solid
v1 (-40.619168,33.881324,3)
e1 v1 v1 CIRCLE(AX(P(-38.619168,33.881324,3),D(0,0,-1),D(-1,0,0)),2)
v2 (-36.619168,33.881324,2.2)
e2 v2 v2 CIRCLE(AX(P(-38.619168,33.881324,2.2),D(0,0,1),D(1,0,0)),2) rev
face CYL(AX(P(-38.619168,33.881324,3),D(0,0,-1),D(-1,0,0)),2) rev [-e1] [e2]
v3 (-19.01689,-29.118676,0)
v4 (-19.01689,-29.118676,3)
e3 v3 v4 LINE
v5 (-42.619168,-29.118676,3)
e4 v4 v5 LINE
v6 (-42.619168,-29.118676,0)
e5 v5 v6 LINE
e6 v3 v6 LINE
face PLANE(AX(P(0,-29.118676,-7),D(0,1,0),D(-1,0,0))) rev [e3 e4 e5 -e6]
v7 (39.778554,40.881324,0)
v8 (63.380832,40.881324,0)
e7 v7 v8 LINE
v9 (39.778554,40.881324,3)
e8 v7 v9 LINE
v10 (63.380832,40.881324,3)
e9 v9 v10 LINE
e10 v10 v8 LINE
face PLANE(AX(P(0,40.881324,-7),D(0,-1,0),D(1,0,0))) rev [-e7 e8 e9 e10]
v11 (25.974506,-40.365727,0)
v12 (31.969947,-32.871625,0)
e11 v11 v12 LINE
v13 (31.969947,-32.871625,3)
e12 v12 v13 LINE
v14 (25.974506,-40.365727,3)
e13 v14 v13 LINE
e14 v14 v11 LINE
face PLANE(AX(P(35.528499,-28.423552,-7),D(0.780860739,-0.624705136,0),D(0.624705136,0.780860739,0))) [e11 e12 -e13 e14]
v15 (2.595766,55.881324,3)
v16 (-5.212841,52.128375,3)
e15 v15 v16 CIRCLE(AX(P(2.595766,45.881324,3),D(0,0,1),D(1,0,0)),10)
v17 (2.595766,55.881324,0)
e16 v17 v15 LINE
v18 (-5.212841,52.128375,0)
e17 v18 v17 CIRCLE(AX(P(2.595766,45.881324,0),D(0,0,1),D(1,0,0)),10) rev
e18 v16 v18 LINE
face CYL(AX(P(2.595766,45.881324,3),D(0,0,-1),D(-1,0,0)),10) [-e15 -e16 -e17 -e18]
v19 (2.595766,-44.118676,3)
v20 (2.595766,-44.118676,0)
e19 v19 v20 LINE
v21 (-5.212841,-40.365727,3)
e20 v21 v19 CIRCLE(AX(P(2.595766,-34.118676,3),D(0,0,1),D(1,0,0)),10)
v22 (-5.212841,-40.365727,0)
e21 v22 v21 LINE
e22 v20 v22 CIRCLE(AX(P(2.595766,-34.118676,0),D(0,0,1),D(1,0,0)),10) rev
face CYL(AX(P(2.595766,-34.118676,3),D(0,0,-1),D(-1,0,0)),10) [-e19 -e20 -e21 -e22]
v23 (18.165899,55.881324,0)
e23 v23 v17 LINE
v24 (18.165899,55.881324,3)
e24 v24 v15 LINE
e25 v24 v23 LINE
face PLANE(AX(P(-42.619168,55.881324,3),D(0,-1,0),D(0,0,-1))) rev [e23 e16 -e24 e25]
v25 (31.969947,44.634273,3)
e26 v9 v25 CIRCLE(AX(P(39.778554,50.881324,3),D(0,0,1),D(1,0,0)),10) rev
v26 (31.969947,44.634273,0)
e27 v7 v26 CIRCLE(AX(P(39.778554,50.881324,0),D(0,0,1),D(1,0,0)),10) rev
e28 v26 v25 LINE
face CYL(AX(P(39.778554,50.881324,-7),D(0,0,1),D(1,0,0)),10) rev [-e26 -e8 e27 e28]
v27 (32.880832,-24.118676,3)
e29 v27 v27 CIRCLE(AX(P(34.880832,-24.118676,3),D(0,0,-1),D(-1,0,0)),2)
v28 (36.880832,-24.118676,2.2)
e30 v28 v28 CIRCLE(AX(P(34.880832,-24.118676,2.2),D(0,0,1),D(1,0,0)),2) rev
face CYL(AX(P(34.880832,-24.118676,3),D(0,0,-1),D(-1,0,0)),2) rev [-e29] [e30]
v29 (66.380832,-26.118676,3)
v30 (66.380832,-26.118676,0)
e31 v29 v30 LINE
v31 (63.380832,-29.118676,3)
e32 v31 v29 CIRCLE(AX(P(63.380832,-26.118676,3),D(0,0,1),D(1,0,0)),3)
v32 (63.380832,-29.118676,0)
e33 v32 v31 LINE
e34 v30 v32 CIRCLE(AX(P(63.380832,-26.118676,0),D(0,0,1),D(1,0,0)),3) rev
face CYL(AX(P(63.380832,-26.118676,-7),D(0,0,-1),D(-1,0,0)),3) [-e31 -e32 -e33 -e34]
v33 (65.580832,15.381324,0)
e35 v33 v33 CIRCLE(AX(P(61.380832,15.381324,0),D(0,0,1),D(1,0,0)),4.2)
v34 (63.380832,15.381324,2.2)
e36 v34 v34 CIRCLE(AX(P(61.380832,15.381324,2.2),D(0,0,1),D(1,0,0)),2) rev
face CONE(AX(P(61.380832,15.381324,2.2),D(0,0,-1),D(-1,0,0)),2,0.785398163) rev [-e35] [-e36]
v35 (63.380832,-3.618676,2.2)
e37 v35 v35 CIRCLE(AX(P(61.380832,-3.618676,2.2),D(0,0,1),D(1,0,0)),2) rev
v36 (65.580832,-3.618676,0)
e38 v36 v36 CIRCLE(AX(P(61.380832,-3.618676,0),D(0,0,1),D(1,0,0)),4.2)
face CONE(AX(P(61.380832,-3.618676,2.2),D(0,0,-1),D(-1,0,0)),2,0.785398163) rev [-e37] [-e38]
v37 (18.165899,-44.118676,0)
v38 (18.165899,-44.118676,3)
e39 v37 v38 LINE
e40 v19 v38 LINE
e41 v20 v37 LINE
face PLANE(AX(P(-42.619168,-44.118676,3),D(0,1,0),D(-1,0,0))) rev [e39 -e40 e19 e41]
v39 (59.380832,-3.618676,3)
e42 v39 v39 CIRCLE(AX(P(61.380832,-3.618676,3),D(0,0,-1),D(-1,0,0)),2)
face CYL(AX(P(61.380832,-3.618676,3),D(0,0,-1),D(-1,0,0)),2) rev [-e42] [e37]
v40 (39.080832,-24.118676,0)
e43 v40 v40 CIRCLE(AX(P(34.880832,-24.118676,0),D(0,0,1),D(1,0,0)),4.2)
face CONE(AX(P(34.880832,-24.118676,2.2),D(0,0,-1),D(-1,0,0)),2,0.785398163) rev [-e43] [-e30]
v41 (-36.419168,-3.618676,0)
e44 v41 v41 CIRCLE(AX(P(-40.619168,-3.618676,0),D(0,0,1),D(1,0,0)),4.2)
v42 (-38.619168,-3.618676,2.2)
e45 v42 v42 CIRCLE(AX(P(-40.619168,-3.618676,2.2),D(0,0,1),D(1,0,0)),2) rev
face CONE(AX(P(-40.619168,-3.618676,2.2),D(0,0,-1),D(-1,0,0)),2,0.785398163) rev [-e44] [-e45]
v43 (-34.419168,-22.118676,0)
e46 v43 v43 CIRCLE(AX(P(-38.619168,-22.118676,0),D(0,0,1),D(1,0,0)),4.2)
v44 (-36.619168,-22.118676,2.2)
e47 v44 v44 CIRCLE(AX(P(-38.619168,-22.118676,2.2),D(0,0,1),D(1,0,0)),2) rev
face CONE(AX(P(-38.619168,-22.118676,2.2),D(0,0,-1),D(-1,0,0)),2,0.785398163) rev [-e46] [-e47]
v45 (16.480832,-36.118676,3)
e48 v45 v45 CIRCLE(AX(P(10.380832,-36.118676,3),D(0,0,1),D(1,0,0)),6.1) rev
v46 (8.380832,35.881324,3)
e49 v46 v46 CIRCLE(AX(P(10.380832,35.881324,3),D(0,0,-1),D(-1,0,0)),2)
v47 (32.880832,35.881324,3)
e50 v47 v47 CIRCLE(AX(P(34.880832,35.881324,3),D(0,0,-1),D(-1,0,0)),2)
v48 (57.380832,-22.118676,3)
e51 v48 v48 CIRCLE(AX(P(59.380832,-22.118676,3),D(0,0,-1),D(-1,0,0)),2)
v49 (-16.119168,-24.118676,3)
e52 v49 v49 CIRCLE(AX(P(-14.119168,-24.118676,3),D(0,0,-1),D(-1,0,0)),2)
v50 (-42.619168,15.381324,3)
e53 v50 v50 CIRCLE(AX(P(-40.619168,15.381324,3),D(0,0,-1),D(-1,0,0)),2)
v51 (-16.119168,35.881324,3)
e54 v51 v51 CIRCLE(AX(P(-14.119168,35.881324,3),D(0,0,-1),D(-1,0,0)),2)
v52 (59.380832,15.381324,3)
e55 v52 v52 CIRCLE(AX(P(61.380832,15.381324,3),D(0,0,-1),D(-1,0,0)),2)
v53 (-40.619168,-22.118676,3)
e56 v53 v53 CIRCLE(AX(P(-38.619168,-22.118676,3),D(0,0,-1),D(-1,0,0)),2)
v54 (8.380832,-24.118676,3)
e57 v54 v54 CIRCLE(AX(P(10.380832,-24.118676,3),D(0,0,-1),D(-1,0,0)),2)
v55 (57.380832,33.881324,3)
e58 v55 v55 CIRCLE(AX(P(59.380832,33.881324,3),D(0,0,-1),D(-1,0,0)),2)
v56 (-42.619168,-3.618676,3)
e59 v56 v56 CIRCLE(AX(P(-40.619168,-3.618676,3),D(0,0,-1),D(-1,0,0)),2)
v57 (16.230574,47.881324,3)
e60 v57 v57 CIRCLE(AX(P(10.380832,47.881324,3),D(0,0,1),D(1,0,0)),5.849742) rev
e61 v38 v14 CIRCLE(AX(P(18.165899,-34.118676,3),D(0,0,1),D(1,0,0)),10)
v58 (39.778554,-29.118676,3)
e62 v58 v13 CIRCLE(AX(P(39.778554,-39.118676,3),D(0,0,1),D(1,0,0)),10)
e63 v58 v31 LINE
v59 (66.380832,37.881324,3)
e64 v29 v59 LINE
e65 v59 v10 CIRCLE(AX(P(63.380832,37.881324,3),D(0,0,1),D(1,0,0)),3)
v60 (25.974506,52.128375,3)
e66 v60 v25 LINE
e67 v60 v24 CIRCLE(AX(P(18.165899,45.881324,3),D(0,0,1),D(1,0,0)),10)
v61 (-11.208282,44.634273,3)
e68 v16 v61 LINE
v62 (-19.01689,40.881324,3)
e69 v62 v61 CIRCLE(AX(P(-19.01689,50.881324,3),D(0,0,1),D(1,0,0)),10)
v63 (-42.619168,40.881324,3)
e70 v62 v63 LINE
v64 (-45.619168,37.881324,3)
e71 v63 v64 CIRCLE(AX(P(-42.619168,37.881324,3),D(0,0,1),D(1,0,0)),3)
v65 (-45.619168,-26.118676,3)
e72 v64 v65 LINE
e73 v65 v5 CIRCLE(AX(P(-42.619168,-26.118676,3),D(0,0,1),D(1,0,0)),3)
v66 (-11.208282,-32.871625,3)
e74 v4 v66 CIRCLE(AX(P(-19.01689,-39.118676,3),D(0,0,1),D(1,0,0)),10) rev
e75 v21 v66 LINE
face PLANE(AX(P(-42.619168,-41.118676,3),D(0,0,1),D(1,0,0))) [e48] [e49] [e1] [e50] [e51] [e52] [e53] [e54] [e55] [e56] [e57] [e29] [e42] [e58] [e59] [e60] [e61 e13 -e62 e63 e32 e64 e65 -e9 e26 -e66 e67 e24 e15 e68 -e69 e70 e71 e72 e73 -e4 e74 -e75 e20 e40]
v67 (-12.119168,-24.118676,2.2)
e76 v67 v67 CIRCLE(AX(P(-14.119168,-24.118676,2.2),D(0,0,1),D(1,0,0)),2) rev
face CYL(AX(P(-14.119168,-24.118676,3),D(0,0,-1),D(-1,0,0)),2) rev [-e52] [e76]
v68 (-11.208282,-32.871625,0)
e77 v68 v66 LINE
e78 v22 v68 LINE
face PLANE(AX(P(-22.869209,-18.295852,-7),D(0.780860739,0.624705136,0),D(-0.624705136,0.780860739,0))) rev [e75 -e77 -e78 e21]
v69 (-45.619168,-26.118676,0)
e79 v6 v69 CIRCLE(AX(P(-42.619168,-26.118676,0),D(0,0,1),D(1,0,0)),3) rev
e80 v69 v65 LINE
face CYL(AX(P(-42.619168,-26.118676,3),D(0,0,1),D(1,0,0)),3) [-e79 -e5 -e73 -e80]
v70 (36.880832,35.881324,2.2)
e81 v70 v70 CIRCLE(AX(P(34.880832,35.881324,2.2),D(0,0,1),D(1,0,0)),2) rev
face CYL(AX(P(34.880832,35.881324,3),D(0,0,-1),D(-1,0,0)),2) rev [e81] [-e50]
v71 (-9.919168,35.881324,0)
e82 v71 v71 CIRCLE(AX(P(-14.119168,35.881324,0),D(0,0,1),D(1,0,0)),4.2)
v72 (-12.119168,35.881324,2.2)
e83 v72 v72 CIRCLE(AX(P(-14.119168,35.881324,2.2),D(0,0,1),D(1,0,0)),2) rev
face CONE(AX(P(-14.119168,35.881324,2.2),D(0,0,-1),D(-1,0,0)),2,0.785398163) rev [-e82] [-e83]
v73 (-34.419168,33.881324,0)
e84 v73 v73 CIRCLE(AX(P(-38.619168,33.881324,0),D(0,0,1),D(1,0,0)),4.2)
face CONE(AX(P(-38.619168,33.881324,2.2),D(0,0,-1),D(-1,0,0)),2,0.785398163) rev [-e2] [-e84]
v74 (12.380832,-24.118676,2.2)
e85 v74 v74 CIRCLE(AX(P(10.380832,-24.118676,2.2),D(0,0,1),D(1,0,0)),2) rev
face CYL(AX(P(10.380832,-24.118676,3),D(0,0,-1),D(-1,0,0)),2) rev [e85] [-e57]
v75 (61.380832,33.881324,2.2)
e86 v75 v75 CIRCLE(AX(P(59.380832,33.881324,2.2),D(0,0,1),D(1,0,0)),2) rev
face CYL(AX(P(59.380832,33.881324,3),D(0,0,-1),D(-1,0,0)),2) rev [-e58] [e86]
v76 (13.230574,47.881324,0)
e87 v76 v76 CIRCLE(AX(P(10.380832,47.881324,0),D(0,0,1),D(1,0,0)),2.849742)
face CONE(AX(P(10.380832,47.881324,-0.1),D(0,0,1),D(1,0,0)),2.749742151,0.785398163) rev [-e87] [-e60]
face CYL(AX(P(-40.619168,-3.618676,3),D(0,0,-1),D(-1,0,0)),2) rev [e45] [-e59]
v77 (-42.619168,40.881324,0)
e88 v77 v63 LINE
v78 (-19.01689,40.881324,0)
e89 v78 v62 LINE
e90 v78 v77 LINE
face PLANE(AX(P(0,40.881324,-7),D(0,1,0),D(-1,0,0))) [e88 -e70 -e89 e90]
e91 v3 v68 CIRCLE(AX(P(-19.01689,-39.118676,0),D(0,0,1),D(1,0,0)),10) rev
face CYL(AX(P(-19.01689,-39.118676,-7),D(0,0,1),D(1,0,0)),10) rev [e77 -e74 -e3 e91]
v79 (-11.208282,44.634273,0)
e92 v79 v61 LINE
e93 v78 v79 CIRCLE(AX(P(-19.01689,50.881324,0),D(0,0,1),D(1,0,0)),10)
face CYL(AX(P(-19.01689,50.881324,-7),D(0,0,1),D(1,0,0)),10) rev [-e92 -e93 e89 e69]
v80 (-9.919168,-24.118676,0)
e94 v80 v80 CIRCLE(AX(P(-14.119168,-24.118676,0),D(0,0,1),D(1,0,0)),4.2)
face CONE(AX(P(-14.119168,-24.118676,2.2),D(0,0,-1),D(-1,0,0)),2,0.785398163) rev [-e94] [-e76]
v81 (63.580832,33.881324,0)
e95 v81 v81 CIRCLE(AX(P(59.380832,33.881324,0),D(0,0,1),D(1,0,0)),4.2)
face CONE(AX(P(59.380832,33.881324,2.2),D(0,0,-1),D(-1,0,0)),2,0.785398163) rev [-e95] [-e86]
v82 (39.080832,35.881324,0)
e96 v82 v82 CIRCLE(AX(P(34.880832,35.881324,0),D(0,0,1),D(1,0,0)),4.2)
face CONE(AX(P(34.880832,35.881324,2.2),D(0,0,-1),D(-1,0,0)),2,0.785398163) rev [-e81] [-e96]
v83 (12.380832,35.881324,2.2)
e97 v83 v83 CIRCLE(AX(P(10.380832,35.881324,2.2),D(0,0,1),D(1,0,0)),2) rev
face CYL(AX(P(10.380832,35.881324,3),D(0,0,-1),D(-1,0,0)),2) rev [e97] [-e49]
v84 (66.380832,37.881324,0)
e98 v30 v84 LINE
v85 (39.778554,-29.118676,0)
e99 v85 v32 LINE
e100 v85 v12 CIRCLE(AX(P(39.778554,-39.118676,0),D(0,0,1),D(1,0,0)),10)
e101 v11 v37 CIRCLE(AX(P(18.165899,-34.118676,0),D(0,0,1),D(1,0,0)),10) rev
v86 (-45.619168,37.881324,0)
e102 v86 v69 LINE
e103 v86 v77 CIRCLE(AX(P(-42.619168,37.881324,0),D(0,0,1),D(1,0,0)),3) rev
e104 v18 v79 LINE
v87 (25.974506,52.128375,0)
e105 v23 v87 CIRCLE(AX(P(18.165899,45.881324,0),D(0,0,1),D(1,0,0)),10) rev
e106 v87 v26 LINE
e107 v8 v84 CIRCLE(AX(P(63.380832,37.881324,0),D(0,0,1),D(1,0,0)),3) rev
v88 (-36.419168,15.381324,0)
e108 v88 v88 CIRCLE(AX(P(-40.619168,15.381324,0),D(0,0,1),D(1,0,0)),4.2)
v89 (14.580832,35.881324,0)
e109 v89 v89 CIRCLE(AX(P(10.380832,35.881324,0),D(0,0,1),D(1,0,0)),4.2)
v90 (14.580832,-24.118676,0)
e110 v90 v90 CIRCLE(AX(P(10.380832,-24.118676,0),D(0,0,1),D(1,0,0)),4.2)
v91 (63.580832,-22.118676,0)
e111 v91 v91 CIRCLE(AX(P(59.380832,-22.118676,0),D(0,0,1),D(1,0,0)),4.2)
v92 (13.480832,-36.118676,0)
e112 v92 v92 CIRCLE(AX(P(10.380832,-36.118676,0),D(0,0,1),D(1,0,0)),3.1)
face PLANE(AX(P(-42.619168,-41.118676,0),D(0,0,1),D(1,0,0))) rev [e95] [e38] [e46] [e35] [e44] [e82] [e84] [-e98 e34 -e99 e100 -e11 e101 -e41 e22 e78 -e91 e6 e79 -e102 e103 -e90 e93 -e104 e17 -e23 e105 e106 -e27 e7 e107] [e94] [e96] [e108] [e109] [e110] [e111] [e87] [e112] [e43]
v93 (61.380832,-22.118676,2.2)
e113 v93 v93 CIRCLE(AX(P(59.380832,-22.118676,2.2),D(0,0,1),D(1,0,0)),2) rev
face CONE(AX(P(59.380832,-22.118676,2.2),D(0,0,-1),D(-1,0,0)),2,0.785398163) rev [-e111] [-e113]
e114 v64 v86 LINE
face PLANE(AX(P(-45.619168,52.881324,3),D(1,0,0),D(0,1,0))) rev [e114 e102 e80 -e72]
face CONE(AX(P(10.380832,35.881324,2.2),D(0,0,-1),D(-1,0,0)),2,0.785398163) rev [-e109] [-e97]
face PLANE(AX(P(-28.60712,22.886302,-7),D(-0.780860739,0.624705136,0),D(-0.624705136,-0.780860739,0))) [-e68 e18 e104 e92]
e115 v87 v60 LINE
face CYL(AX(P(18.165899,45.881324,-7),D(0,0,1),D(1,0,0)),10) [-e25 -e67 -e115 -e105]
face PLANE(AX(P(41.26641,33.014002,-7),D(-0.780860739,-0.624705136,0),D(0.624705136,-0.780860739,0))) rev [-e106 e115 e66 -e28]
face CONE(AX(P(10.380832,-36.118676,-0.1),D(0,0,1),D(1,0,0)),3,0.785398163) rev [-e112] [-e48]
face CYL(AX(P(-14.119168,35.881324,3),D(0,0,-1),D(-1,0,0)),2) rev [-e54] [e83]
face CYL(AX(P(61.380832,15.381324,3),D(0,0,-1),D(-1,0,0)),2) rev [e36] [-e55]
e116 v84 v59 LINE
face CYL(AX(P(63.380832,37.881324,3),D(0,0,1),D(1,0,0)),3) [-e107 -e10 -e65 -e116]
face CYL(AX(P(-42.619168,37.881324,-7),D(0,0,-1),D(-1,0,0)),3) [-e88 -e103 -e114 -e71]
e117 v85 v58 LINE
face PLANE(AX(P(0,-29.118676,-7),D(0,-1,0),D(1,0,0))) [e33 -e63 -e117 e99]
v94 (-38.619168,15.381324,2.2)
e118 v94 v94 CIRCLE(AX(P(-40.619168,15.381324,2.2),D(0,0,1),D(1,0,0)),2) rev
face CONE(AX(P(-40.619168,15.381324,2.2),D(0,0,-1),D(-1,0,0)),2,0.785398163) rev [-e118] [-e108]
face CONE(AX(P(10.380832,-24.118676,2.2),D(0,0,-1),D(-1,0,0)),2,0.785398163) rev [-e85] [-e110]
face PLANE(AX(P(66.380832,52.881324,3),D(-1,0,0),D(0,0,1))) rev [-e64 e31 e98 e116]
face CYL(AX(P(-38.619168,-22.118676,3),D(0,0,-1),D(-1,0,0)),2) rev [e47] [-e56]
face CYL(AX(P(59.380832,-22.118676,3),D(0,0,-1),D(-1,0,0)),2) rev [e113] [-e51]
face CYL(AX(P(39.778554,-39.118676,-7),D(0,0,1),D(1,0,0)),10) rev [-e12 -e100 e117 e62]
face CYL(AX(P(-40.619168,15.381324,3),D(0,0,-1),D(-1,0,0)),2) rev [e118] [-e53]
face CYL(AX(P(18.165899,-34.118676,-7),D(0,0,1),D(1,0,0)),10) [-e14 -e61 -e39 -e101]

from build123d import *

# Parameters (mm, degrees)
BOSS_EXTRUDE1_DEPTH = 3
CUT_EXTRUDE1_START  = -10
SKETCH3_R           = 3
CUT_EXTRUDE1_DEPTH  = 10
FILLET1_R           = 10
FILLET2_R           = 3
SKETCH6_R           = 2.749742151
CUT_EXTRUDE4_DEPTH  = 10
CHAMFER3_SIZE       = 3.1
CUT_EXTRUDE5_REACH  = 88.822
SKETCH7_R           = 1.6
SKETCH8_R           = 2
CUT_EXTRUDE6_DEPTH  = 87.822446845
CHAMFER4_SIZE       = 2.2


with BuildPart() as part:
    # Sketch1 → Boss-Extrude1 (new body)
    with BuildSketch(Plane.XY):
        with BuildLine():
            Line((-42.619167718, 55.881324086), (63.380832282, 55.881324086))
            ThreePointArc((63.380832282, 55.881324086), (65.502152626, 55.002644429), (66.380832282, 52.881324086))
            Line((66.380832282, 52.881324086), (66.380832282, -41.118675914))
            ThreePointArc((66.380832282, -41.118675914), (65.502152626, -43.239996258), (63.380832282, -44.118675914))
            Line((63.380832282, -44.118675914), (-42.619167718, -44.118675914))
            ThreePointArc((-42.619167718, -44.118675914), (-44.740488061, -43.239996258), (-45.619167718, -41.118675914))
            Line((-45.619167718, -41.118675914), (-45.619167718, 52.881324086))
            ThreePointArc((-45.619167718, 52.881324086), (-44.740488061, 55.002644429), (-42.619167718, 55.881324086))
        make_face()
    extrude(amount=BOSS_EXTRUDE1_DEPTH)

    # Sketch3 → Cut-Extrude1 (cut)
    with BuildSketch(Plane.XY.offset(3).offset(CUT_EXTRUDE1_START)):
        with BuildLine():
            Line((-42.619167718, 55.881324086), (-2.210402905, 55.881324086))
            Line((-2.210402905, 55.881324086), (-2.210402905, 63.915751743))
            Line((-2.210402905, 63.915751743), (-45.619167718, 63.915751743))
            Line((-45.619167718, 63.915751743), (-45.619167718, 52.881324086))
            ThreePointArc((-45.619167718, 52.881324086), (-44.740488061, 55.002644429), (-42.619167718, 55.881324086))
        make_face()
        with BuildLine():
            Line((-11.208282286, 44.63427273), (-2.210402905, 55.881324086))
            Line((-2.210402905, 55.881324086), (-42.619167718, 55.881324086))
            ThreePointArc((-42.619167718, 55.881324086), (-44.740488061, 55.002644429), (-45.619167718, 52.881324086))
            Line((-45.619167718, 52.881324086), (-45.619167718, 40.881324086))
            Line((-45.619167718, 40.881324086), (-19.016889675, 40.881324086))
            ThreePointArc((-19.016889675, 40.881324086), (-14.68506059, 41.868263741), (-11.208282286, 44.63427273))
        make_face()
        with BuildLine():
            Line((22.972067469, 63.915751743), (22.972067469, 55.881324086))
            Line((22.972067469, 55.881324086), (63.380832282, 55.881324086))
            ThreePointArc((63.380832282, 55.881324086), (65.502152626, 55.002644429), (66.380832282, 52.881324086))
            Line((66.380832282, 52.881324086), (66.380832282, 63.915751743))
            Line((66.380832282, 63.915751743), (22.972067469, 63.915751743))
        make_face()
        with BuildLine():
            Line((63.380832282, 55.881324086), (22.972067469, 55.881324086))
            Line((22.972067469, 55.881324086), (31.969946851, 44.63427273))
            ThreePointArc((31.969946851, 44.63427273), (35.446725155, 41.868263741), (39.77855424, 40.881324086))
            Line((39.77855424, 40.881324086), (66.380832282, 40.881324086))
            Line((66.380832282, 40.881324086), (66.380832282, 52.881324086))
            ThreePointArc((66.380832282, 52.881324086), (65.502152626, 55.002644429), (63.380832282, 55.881324086))
        make_face()
        with BuildLine():
            Line((66.380832282, -41.118675914), (66.380832282, -29.118675914))
            Line((66.380832282, -29.118675914), (39.77855424, -29.118675914))
            ThreePointArc((39.77855424, -29.118675914), (35.446725155, -30.105615569), (31.969946851, -32.871624558))
            Line((31.969946851, -32.871624558), (22.972067469, -44.118675914))
            Line((22.972067469, -44.118675914), (63.380832282, -44.118675914))
            ThreePointArc((63.380832282, -44.118675914), (65.502152626, -43.239996258), (66.380832282, -41.118675914))
        make_face()
        with BuildLine():
            Line((66.380832282, -52.153103571), (66.380832282, -41.118675914))
            ThreePointArc((66.380832282, -41.118675914), (65.502152626, -43.239996258), (63.380832282, -44.118675914))
            Line((63.380832282, -44.118675914), (22.972067469, -44.118675914))
            Line((22.972067469, -44.118675914), (22.972067469, -52.153103571))
            Line((22.972067469, -52.153103571), (66.380832282, -52.153103571))
        make_face()
        with BuildLine():
            Line((-19.016889675, -29.118675914), (-45.619167718, -29.118675914))
            Line((-45.619167718, -29.118675914), (-45.619167718, -41.118675914))
            ThreePointArc((-45.619167718, -41.118675914), (-44.740488061, -43.239996258), (-42.619167718, -44.118675914))
            Line((-42.619167718, -44.118675914), (-2.210402905, -44.118675914))
            Line((-2.210402905, -44.118675914), (-11.208282286, -32.871624558))
            ThreePointArc((-11.208282286, -32.871624558), (-14.68506059, -30.105615569), (-19.016889675, -29.118675914))
        make_face()
        with BuildLine():
            ThreePointArc((-42.619167718, -44.118675914), (-44.740488061, -43.239996258), (-45.619167718, -41.118675914))
            Line((-45.619167718, -41.118675914), (-45.619167718, -52.153103571))
            Line((-45.619167718, -52.153103571), (-2.210402905, -52.153103571))
            Line((-2.210402905, -52.153103571), (-2.210402905, -44.118675914))
            Line((-2.210402905, -44.118675914), (-42.619167718, -44.118675914))
        make_face()
        with Locations((10.380832282, -36.118675914)):
            Circle(SKETCH3_R)
    extrude(amount=CUT_EXTRUDE1_DEPTH, mode=Mode.SUBTRACT)

    # Fillet1
    fillet1_edges = [part.edges().sort_by_distance(p)[0] for p in [
        (-2.210402905, 55.881324086, 1.5),
        (22.972067469, 55.881324086, 1.5),
        (22.972067469, -44.118675914, 1.5),
        (-2.210402905, -44.118675914, 1.5),
    ]]
    fillet(fillet1_edges, radius=FILLET1_R)

    # Fillet2
    fillet2_edges = [part.edges().sort_by_distance(p)[0] for p in [
        (-45.619167718, -29.118675914, 1.5),
        (-45.619167718, 40.881324086, 1.5),
        (66.380832282, 40.881324086, 1.5),
        (66.380832282, -29.118675914, 1.5),
    ]]
    fillet(fillet2_edges, radius=FILLET2_R)

    # Sketch6 → Cut-Extrude4 (cut)
    with BuildSketch(Plane.XY.offset(3)):
        with Locations((10.380832282, 47.881324086)):
            Circle(SKETCH6_R)
    extrude(amount=-CUT_EXTRUDE4_DEPTH, mode=Mode.SUBTRACT)

    # Chamfer3
    # the kernel refuses this chamfer: 3.1 mm, written as the material it takes off along each edge
    with BuildSketch(Plane(origin=(10.380832282, -36.118675914, 3), x_dir=(1, 0, 0), z_dir=(0, -1, 0))) as chamfer3_piece_1:
        Polygon((3, -CHAMFER3_SIZE), (3 + CHAMFER3_SIZE, 0), (3, 0), align=None)
    revolve(axis=Axis((10.380832282, -36.118675914, 3), (0, 0, 1)), mode=Mode.SUBTRACT)
    with BuildSketch(Plane(origin=(10.380832282, 47.881324086, 3), x_dir=(1, 0, 0), z_dir=(0, -1, 0))) as chamfer3_piece_2:
        Polygon((2.749742151, -CHAMFER3_SIZE), (2.749742151 + CHAMFER3_SIZE, 0), (2.749742151, 0), align=None)
    revolve(axis=Axis((10.380832282, 47.881324086, 3), (0, 0, 1)), mode=Mode.SUBTRACT)

    # Sketch7 → Cut-Extrude5 (cut, up to next)
    with BuildSketch(Plane(origin=(0, 0, 0), x_dir=(-1, 0, 0), z_dir=(0, 0, -1)), mode=Mode.PRIVATE) as cut_extrude5_sk1:
        with Locations((38.619167718, -22.118675914)):
            Circle(SKETCH7_R)
    cut_extrude5_tool1 = extrude(cut_extrude5_sk1.sketch, amount=-CUT_EXTRUDE5_REACH, mode=Mode.PRIVATE) & part.part
    # Sketch7 → Cut-Extrude5 (cut, up to next)
    with BuildSketch(Plane(origin=(0, 0, 0), x_dir=(-1, 0, 0), z_dir=(0, 0, -1)), mode=Mode.PRIVATE) as cut_extrude5_sk2:
        with Locations((14.119167718, -24.118675914)):
            Circle(SKETCH7_R)
    cut_extrude5_tool2 = extrude(cut_extrude5_sk2.sketch, amount=-CUT_EXTRUDE5_REACH, mode=Mode.PRIVATE) & part.part
    # Sketch7 → Cut-Extrude5 (cut, up to next)
    with BuildSketch(Plane(origin=(0, 0, 0), x_dir=(-1, 0, 0), z_dir=(0, 0, -1)), mode=Mode.PRIVATE) as cut_extrude5_sk3:
        with Locations((-10.380832282, -24.118675914)):
            Circle(SKETCH7_R)
    cut_extrude5_tool3 = extrude(cut_extrude5_sk3.sketch, amount=-CUT_EXTRUDE5_REACH, mode=Mode.PRIVATE) & part.part
    # Sketch7 → Cut-Extrude5 (cut, up to next)
    with BuildSketch(Plane(origin=(0, 0, 0), x_dir=(-1, 0, 0), z_dir=(0, 0, -1)), mode=Mode.PRIVATE) as cut_extrude5_sk4:
        with Locations((-34.880832282, -24.118675914)):
            Circle(SKETCH7_R)
    cut_extrude5_tool4 = extrude(cut_extrude5_sk4.sketch, amount=-CUT_EXTRUDE5_REACH, mode=Mode.PRIVATE) & part.part
    # Sketch7 → Cut-Extrude5 (cut, up to next)
    with BuildSketch(Plane(origin=(0, 0, 0), x_dir=(-1, 0, 0), z_dir=(0, 0, -1)), mode=Mode.PRIVATE) as cut_extrude5_sk5:
        with Locations((-59.380832282, -22.118675914)):
            Circle(SKETCH7_R)
    cut_extrude5_tool5 = extrude(cut_extrude5_sk5.sketch, amount=-CUT_EXTRUDE5_REACH, mode=Mode.PRIVATE) & part.part
    # Sketch7 → Cut-Extrude5 (cut, up to next)
    with BuildSketch(Plane(origin=(0, 0, 0), x_dir=(-1, 0, 0), z_dir=(0, 0, -1)), mode=Mode.PRIVATE) as cut_extrude5_sk6:
        with Locations((-61.380832282, -3.618675914)):
            Circle(SKETCH7_R)
    cut_extrude5_tool6 = extrude(cut_extrude5_sk6.sketch, amount=-CUT_EXTRUDE5_REACH, mode=Mode.PRIVATE) & part.part
    # Sketch7 → Cut-Extrude5 (cut, up to next)
    with BuildSketch(Plane(origin=(0, 0, 0), x_dir=(-1, 0, 0), z_dir=(0, 0, -1)), mode=Mode.PRIVATE) as cut_extrude5_sk7:
        with Locations((-61.380832282, 15.381324086)):
            Circle(SKETCH7_R)
    cut_extrude5_tool7 = extrude(cut_extrude5_sk7.sketch, amount=-CUT_EXTRUDE5_REACH, mode=Mode.PRIVATE) & part.part
    # Sketch7 → Cut-Extrude5 (cut, up to next)
    with BuildSketch(Plane(origin=(0, 0, 0), x_dir=(-1, 0, 0), z_dir=(0, 0, -1)), mode=Mode.PRIVATE) as cut_extrude5_sk8:
        with Locations((-59.380832282, 33.881324086)):
            Circle(SKETCH7_R)
    cut_extrude5_tool8 = extrude(cut_extrude5_sk8.sketch, amount=-CUT_EXTRUDE5_REACH, mode=Mode.PRIVATE) & part.part
    # Sketch7 → Cut-Extrude5 (cut, up to next)
    with BuildSketch(Plane(origin=(0, 0, 0), x_dir=(-1, 0, 0), z_dir=(0, 0, -1)), mode=Mode.PRIVATE) as cut_extrude5_sk9:
        with Locations((-34.880832282, 35.881324086)):
            Circle(SKETCH7_R)
    cut_extrude5_tool9 = extrude(cut_extrude5_sk9.sketch, amount=-CUT_EXTRUDE5_REACH, mode=Mode.PRIVATE) & part.part
    # Sketch7 → Cut-Extrude5 (cut, up to next)
    with BuildSketch(Plane(origin=(0, 0, 0), x_dir=(-1, 0, 0), z_dir=(0, 0, -1)), mode=Mode.PRIVATE) as cut_extrude5_sk10:
        with Locations((-10.380832282, 35.881324086)):
            Circle(SKETCH7_R)
    cut_extrude5_tool10 = extrude(cut_extrude5_sk10.sketch, amount=-CUT_EXTRUDE5_REACH, mode=Mode.PRIVATE) & part.part
    # Sketch7 → Cut-Extrude5 (cut, up to next)
    with BuildSketch(Plane(origin=(0, 0, 0), x_dir=(-1, 0, 0), z_dir=(0, 0, -1)), mode=Mode.PRIVATE) as cut_extrude5_sk11:
        with Locations((14.119167718, 35.881324086)):
            Circle(SKETCH7_R)
    cut_extrude5_tool11 = extrude(cut_extrude5_sk11.sketch, amount=-CUT_EXTRUDE5_REACH, mode=Mode.PRIVATE) & part.part
    # Sketch7 → Cut-Extrude5 (cut, up to next)
    with BuildSketch(Plane(origin=(0, 0, 0), x_dir=(-1, 0, 0), z_dir=(0, 0, -1)), mode=Mode.PRIVATE) as cut_extrude5_sk12:
        with Locations((38.619167718, 33.881324086)):
            Circle(SKETCH7_R)
    cut_extrude5_tool12 = extrude(cut_extrude5_sk12.sketch, amount=-CUT_EXTRUDE5_REACH, mode=Mode.PRIVATE) & part.part
    # Sketch7 → Cut-Extrude5 (cut, up to next)
    with BuildSketch(Plane(origin=(0, 0, 0), x_dir=(-1, 0, 0), z_dir=(0, 0, -1)), mode=Mode.PRIVATE) as cut_extrude5_sk13:
        with Locations((40.619167718, 15.381324086)):
            Circle(SKETCH7_R)
    cut_extrude5_tool13 = extrude(cut_extrude5_sk13.sketch, amount=-CUT_EXTRUDE5_REACH, mode=Mode.PRIVATE) & part.part
    # Sketch7 → Cut-Extrude5 (cut, up to next)
    with BuildSketch(Plane(origin=(0, 0, 0), x_dir=(-1, 0, 0), z_dir=(0, 0, -1)), mode=Mode.PRIVATE) as cut_extrude5_sk14:
        with Locations((40.619167718, -3.618675914)):
            Circle(SKETCH7_R)
    cut_extrude5_tool14 = extrude(cut_extrude5_sk14.sketch, amount=-CUT_EXTRUDE5_REACH, mode=Mode.PRIVATE) & part.part
    add(cut_extrude5_tool1.solids().sort_by_distance((-38.619168, -22.118676, 0))[0], mode=Mode.SUBTRACT)
    add(cut_extrude5_tool2.solids().sort_by_distance((-14.119168, -24.118676, 0))[0], mode=Mode.SUBTRACT)
    add(cut_extrude5_tool3.solids().sort_by_distance((10.380832, -24.118676, 0))[0], mode=Mode.SUBTRACT)
    add(cut_extrude5_tool4.solids().sort_by_distance((34.880832, -24.118676, 0))[0], mode=Mode.SUBTRACT)
    add(cut_extrude5_tool5.solids().sort_by_distance((59.380832, -22.118676, 0))[0], mode=Mode.SUBTRACT)
    add(cut_extrude5_tool6.solids().sort_by_distance((61.380832, -3.618676, 0))[0], mode=Mode.SUBTRACT)
    add(cut_extrude5_tool7.solids().sort_by_distance((61.380832, 15.381324, 0))[0], mode=Mode.SUBTRACT)
    add(cut_extrude5_tool8.solids().sort_by_distance((59.380832, 33.881324, 0))[0], mode=Mode.SUBTRACT)
    add(cut_extrude5_tool9.solids().sort_by_distance((34.880832, 35.881324, 0))[0], mode=Mode.SUBTRACT)
    add(cut_extrude5_tool10.solids().sort_by_distance((10.380832, 35.881324, 0))[0], mode=Mode.SUBTRACT)
    add(cut_extrude5_tool11.solids().sort_by_distance((-14.119168, 35.881324, 0))[0], mode=Mode.SUBTRACT)
    add(cut_extrude5_tool12.solids().sort_by_distance((-38.619168, 33.881324, 0))[0], mode=Mode.SUBTRACT)
    add(cut_extrude5_tool13.solids().sort_by_distance((-40.619168, 15.381324, 0))[0], mode=Mode.SUBTRACT)
    add(cut_extrude5_tool14.solids().sort_by_distance((-40.619168, -3.618676, 0))[0], mode=Mode.SUBTRACT)

    # Sketch8 → Cut-Extrude6 (cut, through all)
    with BuildSketch(Plane(origin=(0, 0, 0), x_dir=(-1, 0, 0), z_dir=(0, 0, -1))):
        with Locations((-59.380832282, 33.881324086)):
            Circle(SKETCH8_R)
        with Locations((-34.880832282, 35.881324086)):
            Circle(SKETCH8_R)
        with Locations((-10.380832282, 35.881324086)):
            Circle(SKETCH8_R)
        with Locations((14.119167718, 35.881324086)):
            Circle(SKETCH8_R)
        with Locations((38.619167718, 33.881324086)):
            Circle(SKETCH8_R)
        with Locations((40.619167718, 15.381324086)):
            Circle(SKETCH8_R)
        with Locations((38.619167718, -22.118675914)):
            Circle(SKETCH8_R)
        with Locations((40.619167718, -3.618675914)):
            Circle(SKETCH8_R)
        with Locations((14.119167718, -24.118675914)):
            Circle(SKETCH8_R)
        with Locations((-10.380832282, -24.118675914)):
            Circle(SKETCH8_R)
        with Locations((-34.880832282, -24.118675914)):
            Circle(SKETCH8_R)
        with Locations((-59.380832282, -22.118675914)):
            Circle(SKETCH8_R)
        with Locations((-61.380832282, -3.618675914)):
            Circle(SKETCH8_R)
        with Locations((-61.380832282, 15.381324086)):
            Circle(SKETCH8_R)
    extrude(amount=-CUT_EXTRUDE6_DEPTH, mode=Mode.SUBTRACT)

    # Chamfer4
    chamfer4_edges = [part.edges().sort_by_distance(p)[0] for p in [
        (61.380832282, 33.881324086, 0),
        (63.380832282, 15.381324086, 0),
        (63.380832282, -3.618675914, 0),
        (61.380832282, -22.118675914, 0),
        (36.880832282, -24.118675914, 0),
        (12.380832282, -24.118675914, 0),
        (-12.119167718, -24.118675914, 0),
        (-38.619167718, -3.618675914, 0),
        (-36.619167718, -22.118675914, 0),
        (-38.619167718, 15.381324086, 0),
        (-36.619167718, 33.881324086, 0),
        (-12.119167718, 35.881324086, 0),
        (12.380832282, 35.881324086, 0),
        (36.880832282, 35.881324086, 0),
    ]]
    chamfer(chamfer4_edges, length=CHAMFER4_SIZE)


solid = part.part
